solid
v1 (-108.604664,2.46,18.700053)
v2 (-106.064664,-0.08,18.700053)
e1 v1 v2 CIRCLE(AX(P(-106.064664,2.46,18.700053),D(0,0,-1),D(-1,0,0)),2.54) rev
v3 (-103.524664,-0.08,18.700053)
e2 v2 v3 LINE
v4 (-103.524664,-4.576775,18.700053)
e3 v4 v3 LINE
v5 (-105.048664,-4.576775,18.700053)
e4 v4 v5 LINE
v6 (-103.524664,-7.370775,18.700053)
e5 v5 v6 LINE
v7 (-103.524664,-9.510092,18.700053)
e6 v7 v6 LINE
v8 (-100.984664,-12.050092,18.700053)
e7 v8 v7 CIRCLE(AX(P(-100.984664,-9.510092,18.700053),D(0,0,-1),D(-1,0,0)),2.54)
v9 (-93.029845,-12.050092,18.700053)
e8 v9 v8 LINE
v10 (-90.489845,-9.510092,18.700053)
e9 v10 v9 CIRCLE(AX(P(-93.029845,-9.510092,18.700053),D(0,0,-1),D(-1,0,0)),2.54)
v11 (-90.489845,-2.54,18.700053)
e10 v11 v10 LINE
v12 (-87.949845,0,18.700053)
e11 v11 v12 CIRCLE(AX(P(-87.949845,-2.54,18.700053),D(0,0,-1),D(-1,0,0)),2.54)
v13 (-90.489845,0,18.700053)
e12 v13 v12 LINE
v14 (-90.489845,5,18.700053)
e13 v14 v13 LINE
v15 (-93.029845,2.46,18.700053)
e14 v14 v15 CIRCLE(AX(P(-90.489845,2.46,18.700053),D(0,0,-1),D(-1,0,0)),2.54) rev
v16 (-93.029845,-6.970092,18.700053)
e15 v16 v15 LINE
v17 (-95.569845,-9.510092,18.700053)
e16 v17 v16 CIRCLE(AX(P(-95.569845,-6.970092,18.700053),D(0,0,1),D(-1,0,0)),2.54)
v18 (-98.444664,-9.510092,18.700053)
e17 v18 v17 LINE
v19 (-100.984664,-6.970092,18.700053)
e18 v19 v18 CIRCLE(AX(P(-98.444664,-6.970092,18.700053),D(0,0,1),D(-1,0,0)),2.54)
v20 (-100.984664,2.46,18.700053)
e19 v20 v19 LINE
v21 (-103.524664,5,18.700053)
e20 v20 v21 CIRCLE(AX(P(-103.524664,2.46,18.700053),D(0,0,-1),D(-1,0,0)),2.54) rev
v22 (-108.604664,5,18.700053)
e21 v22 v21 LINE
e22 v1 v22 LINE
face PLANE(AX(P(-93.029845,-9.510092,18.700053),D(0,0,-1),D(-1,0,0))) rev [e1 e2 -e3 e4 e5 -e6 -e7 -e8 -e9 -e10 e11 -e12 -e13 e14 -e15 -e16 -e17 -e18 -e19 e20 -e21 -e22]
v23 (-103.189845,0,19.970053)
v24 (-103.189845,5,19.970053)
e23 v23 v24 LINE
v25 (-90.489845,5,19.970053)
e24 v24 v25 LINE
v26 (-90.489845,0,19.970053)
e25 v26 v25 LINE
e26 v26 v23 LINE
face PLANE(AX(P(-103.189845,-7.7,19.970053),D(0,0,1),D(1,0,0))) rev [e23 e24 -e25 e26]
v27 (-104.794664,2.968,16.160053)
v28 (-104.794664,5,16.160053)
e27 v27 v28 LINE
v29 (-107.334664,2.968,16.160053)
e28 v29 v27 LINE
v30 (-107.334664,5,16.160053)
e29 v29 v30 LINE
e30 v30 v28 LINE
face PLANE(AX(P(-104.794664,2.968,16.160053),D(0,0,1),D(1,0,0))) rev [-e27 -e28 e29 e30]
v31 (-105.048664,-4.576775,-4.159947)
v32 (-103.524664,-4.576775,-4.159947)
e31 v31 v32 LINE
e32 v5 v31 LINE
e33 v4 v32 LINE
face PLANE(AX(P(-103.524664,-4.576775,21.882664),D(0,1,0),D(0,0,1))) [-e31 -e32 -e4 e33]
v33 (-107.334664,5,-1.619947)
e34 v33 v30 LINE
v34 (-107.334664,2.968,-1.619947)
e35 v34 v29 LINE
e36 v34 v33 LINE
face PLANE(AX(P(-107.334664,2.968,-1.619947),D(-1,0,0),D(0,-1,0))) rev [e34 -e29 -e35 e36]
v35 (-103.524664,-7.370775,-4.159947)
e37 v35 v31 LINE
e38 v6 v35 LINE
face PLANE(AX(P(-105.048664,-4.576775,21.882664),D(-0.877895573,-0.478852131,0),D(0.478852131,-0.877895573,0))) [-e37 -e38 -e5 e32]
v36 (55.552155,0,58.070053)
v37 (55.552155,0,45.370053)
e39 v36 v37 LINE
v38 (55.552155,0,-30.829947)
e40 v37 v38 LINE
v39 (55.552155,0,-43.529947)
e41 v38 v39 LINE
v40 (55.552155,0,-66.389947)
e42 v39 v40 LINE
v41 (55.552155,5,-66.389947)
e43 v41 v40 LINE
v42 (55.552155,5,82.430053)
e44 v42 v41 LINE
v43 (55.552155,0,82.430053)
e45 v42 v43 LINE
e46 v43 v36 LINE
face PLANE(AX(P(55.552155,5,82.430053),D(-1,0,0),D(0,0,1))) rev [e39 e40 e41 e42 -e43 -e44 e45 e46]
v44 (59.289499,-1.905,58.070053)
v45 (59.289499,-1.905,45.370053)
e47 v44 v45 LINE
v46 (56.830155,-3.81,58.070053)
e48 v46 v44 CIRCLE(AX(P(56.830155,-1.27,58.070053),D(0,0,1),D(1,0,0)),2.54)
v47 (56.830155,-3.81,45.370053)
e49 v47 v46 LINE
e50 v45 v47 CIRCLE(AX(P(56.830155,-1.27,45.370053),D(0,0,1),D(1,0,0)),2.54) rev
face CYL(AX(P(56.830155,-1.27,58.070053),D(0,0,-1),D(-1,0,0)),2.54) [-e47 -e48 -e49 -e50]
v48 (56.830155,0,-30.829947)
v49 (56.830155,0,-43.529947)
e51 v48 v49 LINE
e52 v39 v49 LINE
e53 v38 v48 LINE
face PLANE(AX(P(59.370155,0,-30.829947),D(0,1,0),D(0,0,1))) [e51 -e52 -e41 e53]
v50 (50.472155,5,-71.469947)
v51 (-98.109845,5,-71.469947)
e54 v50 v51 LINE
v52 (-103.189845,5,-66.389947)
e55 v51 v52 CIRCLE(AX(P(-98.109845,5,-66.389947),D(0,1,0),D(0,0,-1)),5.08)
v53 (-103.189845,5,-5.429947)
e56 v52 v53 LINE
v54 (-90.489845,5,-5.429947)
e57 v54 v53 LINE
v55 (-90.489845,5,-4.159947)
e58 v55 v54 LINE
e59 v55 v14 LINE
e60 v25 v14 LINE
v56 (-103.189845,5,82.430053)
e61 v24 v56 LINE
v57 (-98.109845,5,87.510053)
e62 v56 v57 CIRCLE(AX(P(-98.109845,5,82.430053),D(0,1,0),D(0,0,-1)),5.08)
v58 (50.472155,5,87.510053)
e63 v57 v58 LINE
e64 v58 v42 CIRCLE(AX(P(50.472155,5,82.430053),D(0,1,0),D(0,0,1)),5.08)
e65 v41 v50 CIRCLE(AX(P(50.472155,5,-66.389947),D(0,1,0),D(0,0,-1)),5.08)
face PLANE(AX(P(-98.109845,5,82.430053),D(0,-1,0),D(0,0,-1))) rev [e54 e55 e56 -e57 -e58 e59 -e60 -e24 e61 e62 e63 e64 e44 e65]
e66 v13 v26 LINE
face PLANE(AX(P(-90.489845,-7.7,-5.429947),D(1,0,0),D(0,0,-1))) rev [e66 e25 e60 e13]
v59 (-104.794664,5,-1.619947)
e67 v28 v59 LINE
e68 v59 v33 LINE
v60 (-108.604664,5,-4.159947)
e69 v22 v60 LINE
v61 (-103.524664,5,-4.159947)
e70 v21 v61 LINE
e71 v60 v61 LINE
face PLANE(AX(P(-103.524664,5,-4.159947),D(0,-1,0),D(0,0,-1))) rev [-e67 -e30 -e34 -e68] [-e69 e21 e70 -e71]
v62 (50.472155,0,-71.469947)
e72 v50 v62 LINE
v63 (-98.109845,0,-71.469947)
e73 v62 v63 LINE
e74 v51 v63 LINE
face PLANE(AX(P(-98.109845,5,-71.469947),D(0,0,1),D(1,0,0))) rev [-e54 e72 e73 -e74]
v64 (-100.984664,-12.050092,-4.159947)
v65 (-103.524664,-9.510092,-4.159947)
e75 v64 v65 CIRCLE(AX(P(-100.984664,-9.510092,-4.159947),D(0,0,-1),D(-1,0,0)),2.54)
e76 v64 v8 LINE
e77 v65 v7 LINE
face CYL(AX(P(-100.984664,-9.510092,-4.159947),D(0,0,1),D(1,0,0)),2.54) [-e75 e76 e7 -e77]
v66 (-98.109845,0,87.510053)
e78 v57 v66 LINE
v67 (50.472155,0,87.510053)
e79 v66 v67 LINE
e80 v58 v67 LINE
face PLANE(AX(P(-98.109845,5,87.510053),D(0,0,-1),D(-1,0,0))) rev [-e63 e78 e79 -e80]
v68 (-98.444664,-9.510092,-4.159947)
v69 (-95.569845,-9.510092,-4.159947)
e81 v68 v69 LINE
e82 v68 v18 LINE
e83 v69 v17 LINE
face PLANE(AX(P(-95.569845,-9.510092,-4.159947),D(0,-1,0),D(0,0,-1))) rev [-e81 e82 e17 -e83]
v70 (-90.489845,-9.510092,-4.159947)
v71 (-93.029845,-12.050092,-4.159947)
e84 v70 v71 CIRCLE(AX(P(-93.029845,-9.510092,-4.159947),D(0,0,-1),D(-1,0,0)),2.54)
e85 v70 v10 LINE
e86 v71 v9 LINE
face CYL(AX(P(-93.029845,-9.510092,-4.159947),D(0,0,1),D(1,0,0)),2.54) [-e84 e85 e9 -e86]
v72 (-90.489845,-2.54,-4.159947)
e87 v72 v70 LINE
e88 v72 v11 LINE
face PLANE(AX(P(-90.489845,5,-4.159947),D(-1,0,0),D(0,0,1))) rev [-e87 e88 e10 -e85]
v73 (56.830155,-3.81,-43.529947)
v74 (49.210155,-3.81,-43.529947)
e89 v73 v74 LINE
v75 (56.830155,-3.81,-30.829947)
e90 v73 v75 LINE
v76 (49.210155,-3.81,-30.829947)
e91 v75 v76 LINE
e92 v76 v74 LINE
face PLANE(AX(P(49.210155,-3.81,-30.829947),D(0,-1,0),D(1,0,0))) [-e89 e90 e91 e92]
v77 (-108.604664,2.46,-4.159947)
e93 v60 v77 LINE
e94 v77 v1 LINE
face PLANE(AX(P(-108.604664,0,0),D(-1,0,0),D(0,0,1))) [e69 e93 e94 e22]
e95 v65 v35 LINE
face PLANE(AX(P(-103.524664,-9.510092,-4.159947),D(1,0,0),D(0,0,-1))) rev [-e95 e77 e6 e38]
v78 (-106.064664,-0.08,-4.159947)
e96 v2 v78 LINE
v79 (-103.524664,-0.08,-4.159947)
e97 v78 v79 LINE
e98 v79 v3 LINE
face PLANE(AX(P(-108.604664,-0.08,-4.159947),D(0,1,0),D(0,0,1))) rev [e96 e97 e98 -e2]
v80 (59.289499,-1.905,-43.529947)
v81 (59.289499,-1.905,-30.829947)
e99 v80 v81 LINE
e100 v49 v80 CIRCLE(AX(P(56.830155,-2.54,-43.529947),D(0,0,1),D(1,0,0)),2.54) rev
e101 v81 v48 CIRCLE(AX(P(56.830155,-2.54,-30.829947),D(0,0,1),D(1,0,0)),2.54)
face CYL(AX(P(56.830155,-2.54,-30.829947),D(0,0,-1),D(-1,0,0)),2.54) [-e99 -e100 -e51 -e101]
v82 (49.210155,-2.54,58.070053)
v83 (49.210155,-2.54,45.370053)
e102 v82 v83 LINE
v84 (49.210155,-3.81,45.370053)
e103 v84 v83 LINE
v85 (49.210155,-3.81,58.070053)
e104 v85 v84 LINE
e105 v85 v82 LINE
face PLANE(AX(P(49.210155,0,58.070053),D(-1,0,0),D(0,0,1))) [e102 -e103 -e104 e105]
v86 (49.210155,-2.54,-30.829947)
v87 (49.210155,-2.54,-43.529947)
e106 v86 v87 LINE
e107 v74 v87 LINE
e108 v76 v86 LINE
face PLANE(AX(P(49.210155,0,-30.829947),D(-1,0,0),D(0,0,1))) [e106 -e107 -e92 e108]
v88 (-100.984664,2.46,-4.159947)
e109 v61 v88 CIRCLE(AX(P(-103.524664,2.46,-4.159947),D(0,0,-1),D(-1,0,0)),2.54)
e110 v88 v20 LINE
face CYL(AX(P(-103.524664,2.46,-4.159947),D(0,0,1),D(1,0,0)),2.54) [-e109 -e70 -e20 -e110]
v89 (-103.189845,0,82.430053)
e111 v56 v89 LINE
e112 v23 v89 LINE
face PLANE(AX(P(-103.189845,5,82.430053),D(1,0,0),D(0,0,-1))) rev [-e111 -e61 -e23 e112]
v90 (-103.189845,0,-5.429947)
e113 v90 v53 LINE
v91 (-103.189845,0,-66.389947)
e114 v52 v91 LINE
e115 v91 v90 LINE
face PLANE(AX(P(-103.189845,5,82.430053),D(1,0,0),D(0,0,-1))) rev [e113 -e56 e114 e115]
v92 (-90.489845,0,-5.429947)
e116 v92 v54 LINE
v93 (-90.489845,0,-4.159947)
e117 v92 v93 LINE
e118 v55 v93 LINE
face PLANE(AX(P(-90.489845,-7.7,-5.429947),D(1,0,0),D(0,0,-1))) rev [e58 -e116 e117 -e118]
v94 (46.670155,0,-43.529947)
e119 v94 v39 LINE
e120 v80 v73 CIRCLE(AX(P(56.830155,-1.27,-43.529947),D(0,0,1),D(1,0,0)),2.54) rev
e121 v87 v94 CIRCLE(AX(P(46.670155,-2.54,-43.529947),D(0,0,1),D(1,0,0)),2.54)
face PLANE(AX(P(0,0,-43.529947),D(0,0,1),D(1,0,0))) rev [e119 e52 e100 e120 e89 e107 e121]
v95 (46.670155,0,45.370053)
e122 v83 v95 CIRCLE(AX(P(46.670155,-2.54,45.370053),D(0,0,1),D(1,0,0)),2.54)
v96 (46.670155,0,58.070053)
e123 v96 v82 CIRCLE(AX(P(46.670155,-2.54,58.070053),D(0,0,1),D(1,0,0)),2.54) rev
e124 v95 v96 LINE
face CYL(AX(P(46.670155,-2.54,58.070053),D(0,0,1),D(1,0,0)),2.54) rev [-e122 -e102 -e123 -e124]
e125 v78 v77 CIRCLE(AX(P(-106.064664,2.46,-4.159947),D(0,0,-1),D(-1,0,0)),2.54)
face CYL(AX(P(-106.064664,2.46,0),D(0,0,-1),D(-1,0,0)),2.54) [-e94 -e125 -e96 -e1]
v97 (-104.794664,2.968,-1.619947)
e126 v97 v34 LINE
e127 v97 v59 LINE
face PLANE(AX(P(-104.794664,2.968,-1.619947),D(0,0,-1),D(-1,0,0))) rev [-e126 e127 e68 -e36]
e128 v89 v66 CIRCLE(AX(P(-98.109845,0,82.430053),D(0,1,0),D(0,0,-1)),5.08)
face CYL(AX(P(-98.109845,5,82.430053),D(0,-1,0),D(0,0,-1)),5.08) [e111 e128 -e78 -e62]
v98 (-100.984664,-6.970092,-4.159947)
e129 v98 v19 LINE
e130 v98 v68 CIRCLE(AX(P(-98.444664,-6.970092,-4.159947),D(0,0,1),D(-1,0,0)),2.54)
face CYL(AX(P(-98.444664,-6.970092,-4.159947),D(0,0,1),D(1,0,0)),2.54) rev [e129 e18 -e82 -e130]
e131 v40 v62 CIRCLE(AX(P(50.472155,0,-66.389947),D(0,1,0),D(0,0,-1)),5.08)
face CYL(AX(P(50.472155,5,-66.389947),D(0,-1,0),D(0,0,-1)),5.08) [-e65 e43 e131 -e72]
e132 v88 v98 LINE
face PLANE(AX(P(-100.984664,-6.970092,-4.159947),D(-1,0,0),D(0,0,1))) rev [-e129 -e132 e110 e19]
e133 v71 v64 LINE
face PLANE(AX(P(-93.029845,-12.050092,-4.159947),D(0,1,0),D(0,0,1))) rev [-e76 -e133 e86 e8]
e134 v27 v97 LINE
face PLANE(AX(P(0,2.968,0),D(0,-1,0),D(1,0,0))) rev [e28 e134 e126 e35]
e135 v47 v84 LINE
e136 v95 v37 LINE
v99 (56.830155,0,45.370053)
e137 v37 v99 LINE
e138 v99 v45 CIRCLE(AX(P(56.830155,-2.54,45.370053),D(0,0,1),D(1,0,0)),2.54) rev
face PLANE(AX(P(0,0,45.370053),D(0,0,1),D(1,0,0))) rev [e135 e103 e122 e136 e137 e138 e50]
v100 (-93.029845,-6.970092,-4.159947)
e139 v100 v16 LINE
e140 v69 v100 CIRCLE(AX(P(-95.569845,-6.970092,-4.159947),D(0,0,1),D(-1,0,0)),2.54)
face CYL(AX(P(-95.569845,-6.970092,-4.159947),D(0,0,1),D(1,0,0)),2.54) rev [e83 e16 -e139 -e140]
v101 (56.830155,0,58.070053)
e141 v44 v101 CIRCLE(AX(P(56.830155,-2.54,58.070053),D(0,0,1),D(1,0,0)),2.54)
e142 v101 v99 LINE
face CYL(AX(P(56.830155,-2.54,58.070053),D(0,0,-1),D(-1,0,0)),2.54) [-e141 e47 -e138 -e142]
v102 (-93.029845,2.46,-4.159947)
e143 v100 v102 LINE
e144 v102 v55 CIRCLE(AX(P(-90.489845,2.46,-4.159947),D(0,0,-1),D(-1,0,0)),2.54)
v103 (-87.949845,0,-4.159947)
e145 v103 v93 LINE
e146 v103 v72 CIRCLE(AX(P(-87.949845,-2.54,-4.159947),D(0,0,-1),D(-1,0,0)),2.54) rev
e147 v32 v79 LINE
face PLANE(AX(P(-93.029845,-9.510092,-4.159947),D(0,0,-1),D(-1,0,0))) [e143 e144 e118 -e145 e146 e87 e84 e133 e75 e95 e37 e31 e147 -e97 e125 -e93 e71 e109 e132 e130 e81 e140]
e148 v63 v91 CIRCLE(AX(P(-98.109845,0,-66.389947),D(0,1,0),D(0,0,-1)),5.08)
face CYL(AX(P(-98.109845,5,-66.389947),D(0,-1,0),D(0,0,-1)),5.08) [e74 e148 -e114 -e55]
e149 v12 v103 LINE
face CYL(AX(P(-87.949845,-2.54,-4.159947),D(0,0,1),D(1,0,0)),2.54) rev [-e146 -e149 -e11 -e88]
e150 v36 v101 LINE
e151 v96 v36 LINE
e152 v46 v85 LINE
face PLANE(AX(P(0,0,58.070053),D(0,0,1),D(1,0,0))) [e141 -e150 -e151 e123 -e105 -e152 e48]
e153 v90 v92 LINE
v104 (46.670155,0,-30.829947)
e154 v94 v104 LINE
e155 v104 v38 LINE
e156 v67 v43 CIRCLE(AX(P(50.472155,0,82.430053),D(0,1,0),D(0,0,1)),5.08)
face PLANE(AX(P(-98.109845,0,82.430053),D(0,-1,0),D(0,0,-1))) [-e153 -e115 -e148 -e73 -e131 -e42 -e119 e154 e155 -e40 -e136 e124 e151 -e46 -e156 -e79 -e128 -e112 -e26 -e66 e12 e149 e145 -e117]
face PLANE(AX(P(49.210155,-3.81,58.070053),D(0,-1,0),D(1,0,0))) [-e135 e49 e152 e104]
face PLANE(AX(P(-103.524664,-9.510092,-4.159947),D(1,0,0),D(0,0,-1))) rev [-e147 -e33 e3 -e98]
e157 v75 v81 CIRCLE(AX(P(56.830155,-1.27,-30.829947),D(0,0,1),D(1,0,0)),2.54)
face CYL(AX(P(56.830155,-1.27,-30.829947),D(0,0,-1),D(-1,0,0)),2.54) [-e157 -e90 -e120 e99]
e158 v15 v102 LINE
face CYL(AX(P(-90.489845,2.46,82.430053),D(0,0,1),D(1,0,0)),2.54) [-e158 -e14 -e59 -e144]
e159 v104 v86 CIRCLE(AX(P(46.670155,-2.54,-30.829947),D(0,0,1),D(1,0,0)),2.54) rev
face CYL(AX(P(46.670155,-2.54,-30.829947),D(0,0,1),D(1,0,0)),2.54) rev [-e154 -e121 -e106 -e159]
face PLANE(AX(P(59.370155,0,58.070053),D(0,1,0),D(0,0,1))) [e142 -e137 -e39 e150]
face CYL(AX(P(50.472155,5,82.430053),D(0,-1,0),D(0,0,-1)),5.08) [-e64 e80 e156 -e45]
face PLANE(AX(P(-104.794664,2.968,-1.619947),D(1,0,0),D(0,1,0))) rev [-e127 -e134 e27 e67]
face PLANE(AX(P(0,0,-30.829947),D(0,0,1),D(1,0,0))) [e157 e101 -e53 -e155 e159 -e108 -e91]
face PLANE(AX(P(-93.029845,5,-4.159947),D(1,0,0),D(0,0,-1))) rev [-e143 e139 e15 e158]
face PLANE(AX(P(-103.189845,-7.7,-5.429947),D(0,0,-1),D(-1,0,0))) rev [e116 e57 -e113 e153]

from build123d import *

# Parameters (mm, degrees)
BOSS_EXTRUDE1_DEPTH  = 5
SKETCH8_W            = 12.7
SKETCH8_H            = 25.4
CUT_EXTRUDE1_DEPTH   = 12.7
BOSS_EXTRUDE6_START  = 1.27
BOSS_EXTRUDE6_DEPTH  = 22.86
FILLET3_R            = 2.54
SKETCH12_W           = 22.86
SKETCH12_H           = 5.08
BOSS_EXTRUDE7_DEPTH  = 5.08
FILLET8_R            = 2.54
SKETCH13_W           = 2.54
SKETCH13_H           = 17.78
CUT_EXTRUDE2_DEPTH   = 2.032
BOSS_EXTRUDE8_DEPTH  = 22.86
FILLET5_R            = 2.54
FILLET6_R            = 2.54
BOSS_EXTRUDE9_START  = -27.94
SKETCH15_W           = 10.16
SKETCH15_H           = 3.81
BOSS_EXTRUDE9_DEPTH  = 12.7
BOSS_EXTRUDE10_START = -116.84
SKETCH15_2_W         = 10.16
SKETCH15_2_H         = 3.81
BOSS_EXTRUDE10_DEPTH = 12.7
FILLET7_R            = 2.54


with BuildPart() as part:
    # Sketch2 → Boss-Extrude1 (new body)
    with BuildSketch(Plane(origin=(0, 0, 0), x_dir=(1, 0, 0), z_dir=(0, 1, 0))):
        with BuildLine():
            Line((-98.109845206, -87.510053172), (50.472154842, -87.510053172))
            ThreePointArc((50.472154842, -87.510053172), (54.064257291, -86.02215562), (55.552154842, -82.430053172))
            Line((55.552154842, -82.430053172), (55.552154842, 66.389946828))
            ThreePointArc((55.552154842, 66.389946828), (54.064257291, 69.982049277), (50.472154842, 71.469946828))
            Line((50.472154842, 71.469946828), (-98.109845206, 71.469946828))
            ThreePointArc((-98.109845206, 71.469946828), (-101.701947654, 69.982049277), (-103.189845206, 66.389946828))
            Line((-103.189845206, 66.389946828), (-103.189845206, -82.430053172))
            ThreePointArc((-103.189845206, -82.430053172), (-101.701947654, -86.02215562), (-98.109845206, -87.510053172))
        make_face()
    extrude(amount=BOSS_EXTRUDE1_DEPTH)

    # Sketch8 → Cut-Extrude1 (cut)
    with BuildSketch(Plane(origin=(0, 5, 0), x_dir=(1, 0, 0), z_dir=(0, 1, 0))):
        with Locations((-96.839845206, -7.270053172)):
            Rectangle(SKETCH8_W, SKETCH8_H)
    extrude(amount=-CUT_EXTRUDE1_DEPTH, mode=Mode.SUBTRACT)

    # Sketch9 → Boss-Extrude6 (add)
    with BuildSketch(Plane(origin=(0, 0, 19.970053172), x_dir=(-1, 0, 0), z_dir=(0, 0, -1)).offset(BOSS_EXTRUDE6_START)):
        with BuildLine():
            Line((90.489845206, 5), (90.489845206, -9.510091846))
            ThreePointArc((90.489845206, -9.510091846), (91.233793982, -11.30614307), (93.029845206, -12.050091846))
            Line((93.029845206, -12.050091846), (100.984663509, -12.050091846))
            ThreePointArc((100.984663509, -12.050091846), (102.780714734, -11.30614307), (103.524663509, -9.510091846))
            Line((103.524663509, -9.510091846), (103.524663509, 5))
            Line((103.524663509, 5), (100.984663509, 5))
            Line((100.984663509, 5), (100.984663509, -6.970091846))
            ThreePointArc((100.984663509, -6.970091846), (100.240714734, -8.76614307), (98.444663509, -9.510091846))
            Line((98.444663509, -9.510091846), (95.569845206, -9.510091846))
            ThreePointArc((95.569845206, -9.510091846), (93.773793982, -8.76614307), (93.029845206, -6.970091846))
            Line((93.029845206, -6.970091846), (93.029845206, 5))
            Line((93.029845206, 5), (90.489845206, 5))
        make_face()
    extrude(amount=BOSS_EXTRUDE6_DEPTH)

    # Fillet3
    fillet3_edges = [part.edges().sort_by_distance(p)[0] for p in [
        (-90.489845206, 0, 7.270053172),
    ]]
    fillet(fillet3_edges, radius=FILLET3_R)

    # Sketch12 → Boss-Extrude7 (add)
    with BuildSketch(Plane.ZY.offset(103.524663509)):
        with Locations((7.270053172, 2.46)):
            Rectangle(SKETCH12_W, SKETCH12_H)
    extrude(amount=BOSS_EXTRUDE7_DEPTH)

    # Fillet8
    fillet8_edges = [part.edges().sort_by_distance(p)[0] for p in [
        (-100.984663509, 5, 7.270053172),
    ]]
    fillet(fillet8_edges, radius=FILLET8_R)

    # Sketch13 → Cut-Extrude2 (cut)
    with BuildSketch(Plane(origin=(0, 5, 0), x_dir=(1, 0, 0), z_dir=(0, 1, 0))):
        with Locations((-106.064663509, -7.270053172)):
            Rectangle(SKETCH13_W, SKETCH13_H)
    extrude(amount=-CUT_EXTRUDE2_DEPTH, mode=Mode.SUBTRACT)

    # Sketch14 → Boss-Extrude8 (add)
    with BuildSketch(Plane(origin=(0, 0, -4.159946828), x_dir=(-1, 0, 0), z_dir=(0, 0, -1))):
        Polygon((103.524663509, -4.576775108), (105.048663509, -4.576775108), (103.524663509, -7.370775108), align=None)
    extrude(amount=-BOSS_EXTRUDE8_DEPTH)

    # Fillet5
    fillet5_edges = [part.edges().sort_by_distance(p)[0] for p in [
        (-93.029845206, 5, 7.270053172),
    ]]
    fillet(fillet5_edges, radius=FILLET5_R)

    # Fillet6
    fillet6_edges = [part.edges().sort_by_distance(p)[0] for p in [
        (-108.604663509, -0.08, 7.270053172),
    ]]
    fillet(fillet6_edges, radius=FILLET6_R)

    # Sketch15 → Boss-Extrude9 (add)
    with BuildSketch(Plane(origin=(0, 0, -71.469946828), x_dir=(-1, 0, 0), z_dir=(0, 0, -1)).offset(BOSS_EXTRUDE9_START)):
        with Locations((-54.290154794, -1.905)):
            Rectangle(SKETCH15_W, SKETCH15_H)
    extrude(amount=-BOSS_EXTRUDE9_DEPTH)

    # Sketch15<2> → Boss-Extrude10 (add)
    with BuildSketch(Plane(origin=(0, 0, -71.469946828), x_dir=(-1, 0, 0), z_dir=(0, 0, -1)).offset(BOSS_EXTRUDE10_START)):
        with Locations((-54.290154794, -1.905)):
            Rectangle(SKETCH15_2_W, SKETCH15_2_H)
    extrude(amount=-BOSS_EXTRUDE10_DEPTH)

    # Fillet7
    # the kernel refuses this fillet: 2.54 mm, written as the material it adds along each edge
    with BuildSketch(Plane(origin=(49.210154794, 0, 45.370053172), x_dir=(-1, 0, 0), z_dir=(0, 0, 1)), Plane(origin=(49.210154794, 0, -43.529946828), x_dir=(-1, 0, 0), z_dir=(0, 0, 1))) as fillet7_piece_1:
        with BuildLine():
            CenterArc((FILLET7_R, FILLET7_R), FILLET7_R, 180, 90)
            Line((0, FILLET7_R), (0, 0))
            Line((0, 0), (FILLET7_R, 0))
        make_face()
    extrude(amount=12.7)
    # the kernel refuses this fillet: 2.54 mm, written as the material it takes off along each edge
    with BuildSketch(Plane(origin=(59.370154794, 0, 39.020053172), x_dir=(-1, 0, 0), z_dir=(0, 0, 1)), Plane(origin=(59.370154794, -3.81, 39.020053172), x_dir=(0, 1, 0), z_dir=(0, 0, 1)), Plane(origin=(59.370154794, -3.81, -49.879946828), x_dir=(0, 1, 0), z_dir=(0, 0, 1)), Plane(origin=(59.370154794, 0, -49.879946828), x_dir=(-1, 0, 0), z_dir=(0, 0, 1))) as fillet7_2_piece_1:
        with BuildLine():
            CenterArc((FILLET7_R, FILLET7_R), FILLET7_R, 180, 90)
            Line((0, FILLET7_R), (0, 0))
            Line((0, 0), (FILLET7_R, 0))
        make_face()
    extrude(amount=25.4, mode=Mode.SUBTRACT)


solid = part.part
